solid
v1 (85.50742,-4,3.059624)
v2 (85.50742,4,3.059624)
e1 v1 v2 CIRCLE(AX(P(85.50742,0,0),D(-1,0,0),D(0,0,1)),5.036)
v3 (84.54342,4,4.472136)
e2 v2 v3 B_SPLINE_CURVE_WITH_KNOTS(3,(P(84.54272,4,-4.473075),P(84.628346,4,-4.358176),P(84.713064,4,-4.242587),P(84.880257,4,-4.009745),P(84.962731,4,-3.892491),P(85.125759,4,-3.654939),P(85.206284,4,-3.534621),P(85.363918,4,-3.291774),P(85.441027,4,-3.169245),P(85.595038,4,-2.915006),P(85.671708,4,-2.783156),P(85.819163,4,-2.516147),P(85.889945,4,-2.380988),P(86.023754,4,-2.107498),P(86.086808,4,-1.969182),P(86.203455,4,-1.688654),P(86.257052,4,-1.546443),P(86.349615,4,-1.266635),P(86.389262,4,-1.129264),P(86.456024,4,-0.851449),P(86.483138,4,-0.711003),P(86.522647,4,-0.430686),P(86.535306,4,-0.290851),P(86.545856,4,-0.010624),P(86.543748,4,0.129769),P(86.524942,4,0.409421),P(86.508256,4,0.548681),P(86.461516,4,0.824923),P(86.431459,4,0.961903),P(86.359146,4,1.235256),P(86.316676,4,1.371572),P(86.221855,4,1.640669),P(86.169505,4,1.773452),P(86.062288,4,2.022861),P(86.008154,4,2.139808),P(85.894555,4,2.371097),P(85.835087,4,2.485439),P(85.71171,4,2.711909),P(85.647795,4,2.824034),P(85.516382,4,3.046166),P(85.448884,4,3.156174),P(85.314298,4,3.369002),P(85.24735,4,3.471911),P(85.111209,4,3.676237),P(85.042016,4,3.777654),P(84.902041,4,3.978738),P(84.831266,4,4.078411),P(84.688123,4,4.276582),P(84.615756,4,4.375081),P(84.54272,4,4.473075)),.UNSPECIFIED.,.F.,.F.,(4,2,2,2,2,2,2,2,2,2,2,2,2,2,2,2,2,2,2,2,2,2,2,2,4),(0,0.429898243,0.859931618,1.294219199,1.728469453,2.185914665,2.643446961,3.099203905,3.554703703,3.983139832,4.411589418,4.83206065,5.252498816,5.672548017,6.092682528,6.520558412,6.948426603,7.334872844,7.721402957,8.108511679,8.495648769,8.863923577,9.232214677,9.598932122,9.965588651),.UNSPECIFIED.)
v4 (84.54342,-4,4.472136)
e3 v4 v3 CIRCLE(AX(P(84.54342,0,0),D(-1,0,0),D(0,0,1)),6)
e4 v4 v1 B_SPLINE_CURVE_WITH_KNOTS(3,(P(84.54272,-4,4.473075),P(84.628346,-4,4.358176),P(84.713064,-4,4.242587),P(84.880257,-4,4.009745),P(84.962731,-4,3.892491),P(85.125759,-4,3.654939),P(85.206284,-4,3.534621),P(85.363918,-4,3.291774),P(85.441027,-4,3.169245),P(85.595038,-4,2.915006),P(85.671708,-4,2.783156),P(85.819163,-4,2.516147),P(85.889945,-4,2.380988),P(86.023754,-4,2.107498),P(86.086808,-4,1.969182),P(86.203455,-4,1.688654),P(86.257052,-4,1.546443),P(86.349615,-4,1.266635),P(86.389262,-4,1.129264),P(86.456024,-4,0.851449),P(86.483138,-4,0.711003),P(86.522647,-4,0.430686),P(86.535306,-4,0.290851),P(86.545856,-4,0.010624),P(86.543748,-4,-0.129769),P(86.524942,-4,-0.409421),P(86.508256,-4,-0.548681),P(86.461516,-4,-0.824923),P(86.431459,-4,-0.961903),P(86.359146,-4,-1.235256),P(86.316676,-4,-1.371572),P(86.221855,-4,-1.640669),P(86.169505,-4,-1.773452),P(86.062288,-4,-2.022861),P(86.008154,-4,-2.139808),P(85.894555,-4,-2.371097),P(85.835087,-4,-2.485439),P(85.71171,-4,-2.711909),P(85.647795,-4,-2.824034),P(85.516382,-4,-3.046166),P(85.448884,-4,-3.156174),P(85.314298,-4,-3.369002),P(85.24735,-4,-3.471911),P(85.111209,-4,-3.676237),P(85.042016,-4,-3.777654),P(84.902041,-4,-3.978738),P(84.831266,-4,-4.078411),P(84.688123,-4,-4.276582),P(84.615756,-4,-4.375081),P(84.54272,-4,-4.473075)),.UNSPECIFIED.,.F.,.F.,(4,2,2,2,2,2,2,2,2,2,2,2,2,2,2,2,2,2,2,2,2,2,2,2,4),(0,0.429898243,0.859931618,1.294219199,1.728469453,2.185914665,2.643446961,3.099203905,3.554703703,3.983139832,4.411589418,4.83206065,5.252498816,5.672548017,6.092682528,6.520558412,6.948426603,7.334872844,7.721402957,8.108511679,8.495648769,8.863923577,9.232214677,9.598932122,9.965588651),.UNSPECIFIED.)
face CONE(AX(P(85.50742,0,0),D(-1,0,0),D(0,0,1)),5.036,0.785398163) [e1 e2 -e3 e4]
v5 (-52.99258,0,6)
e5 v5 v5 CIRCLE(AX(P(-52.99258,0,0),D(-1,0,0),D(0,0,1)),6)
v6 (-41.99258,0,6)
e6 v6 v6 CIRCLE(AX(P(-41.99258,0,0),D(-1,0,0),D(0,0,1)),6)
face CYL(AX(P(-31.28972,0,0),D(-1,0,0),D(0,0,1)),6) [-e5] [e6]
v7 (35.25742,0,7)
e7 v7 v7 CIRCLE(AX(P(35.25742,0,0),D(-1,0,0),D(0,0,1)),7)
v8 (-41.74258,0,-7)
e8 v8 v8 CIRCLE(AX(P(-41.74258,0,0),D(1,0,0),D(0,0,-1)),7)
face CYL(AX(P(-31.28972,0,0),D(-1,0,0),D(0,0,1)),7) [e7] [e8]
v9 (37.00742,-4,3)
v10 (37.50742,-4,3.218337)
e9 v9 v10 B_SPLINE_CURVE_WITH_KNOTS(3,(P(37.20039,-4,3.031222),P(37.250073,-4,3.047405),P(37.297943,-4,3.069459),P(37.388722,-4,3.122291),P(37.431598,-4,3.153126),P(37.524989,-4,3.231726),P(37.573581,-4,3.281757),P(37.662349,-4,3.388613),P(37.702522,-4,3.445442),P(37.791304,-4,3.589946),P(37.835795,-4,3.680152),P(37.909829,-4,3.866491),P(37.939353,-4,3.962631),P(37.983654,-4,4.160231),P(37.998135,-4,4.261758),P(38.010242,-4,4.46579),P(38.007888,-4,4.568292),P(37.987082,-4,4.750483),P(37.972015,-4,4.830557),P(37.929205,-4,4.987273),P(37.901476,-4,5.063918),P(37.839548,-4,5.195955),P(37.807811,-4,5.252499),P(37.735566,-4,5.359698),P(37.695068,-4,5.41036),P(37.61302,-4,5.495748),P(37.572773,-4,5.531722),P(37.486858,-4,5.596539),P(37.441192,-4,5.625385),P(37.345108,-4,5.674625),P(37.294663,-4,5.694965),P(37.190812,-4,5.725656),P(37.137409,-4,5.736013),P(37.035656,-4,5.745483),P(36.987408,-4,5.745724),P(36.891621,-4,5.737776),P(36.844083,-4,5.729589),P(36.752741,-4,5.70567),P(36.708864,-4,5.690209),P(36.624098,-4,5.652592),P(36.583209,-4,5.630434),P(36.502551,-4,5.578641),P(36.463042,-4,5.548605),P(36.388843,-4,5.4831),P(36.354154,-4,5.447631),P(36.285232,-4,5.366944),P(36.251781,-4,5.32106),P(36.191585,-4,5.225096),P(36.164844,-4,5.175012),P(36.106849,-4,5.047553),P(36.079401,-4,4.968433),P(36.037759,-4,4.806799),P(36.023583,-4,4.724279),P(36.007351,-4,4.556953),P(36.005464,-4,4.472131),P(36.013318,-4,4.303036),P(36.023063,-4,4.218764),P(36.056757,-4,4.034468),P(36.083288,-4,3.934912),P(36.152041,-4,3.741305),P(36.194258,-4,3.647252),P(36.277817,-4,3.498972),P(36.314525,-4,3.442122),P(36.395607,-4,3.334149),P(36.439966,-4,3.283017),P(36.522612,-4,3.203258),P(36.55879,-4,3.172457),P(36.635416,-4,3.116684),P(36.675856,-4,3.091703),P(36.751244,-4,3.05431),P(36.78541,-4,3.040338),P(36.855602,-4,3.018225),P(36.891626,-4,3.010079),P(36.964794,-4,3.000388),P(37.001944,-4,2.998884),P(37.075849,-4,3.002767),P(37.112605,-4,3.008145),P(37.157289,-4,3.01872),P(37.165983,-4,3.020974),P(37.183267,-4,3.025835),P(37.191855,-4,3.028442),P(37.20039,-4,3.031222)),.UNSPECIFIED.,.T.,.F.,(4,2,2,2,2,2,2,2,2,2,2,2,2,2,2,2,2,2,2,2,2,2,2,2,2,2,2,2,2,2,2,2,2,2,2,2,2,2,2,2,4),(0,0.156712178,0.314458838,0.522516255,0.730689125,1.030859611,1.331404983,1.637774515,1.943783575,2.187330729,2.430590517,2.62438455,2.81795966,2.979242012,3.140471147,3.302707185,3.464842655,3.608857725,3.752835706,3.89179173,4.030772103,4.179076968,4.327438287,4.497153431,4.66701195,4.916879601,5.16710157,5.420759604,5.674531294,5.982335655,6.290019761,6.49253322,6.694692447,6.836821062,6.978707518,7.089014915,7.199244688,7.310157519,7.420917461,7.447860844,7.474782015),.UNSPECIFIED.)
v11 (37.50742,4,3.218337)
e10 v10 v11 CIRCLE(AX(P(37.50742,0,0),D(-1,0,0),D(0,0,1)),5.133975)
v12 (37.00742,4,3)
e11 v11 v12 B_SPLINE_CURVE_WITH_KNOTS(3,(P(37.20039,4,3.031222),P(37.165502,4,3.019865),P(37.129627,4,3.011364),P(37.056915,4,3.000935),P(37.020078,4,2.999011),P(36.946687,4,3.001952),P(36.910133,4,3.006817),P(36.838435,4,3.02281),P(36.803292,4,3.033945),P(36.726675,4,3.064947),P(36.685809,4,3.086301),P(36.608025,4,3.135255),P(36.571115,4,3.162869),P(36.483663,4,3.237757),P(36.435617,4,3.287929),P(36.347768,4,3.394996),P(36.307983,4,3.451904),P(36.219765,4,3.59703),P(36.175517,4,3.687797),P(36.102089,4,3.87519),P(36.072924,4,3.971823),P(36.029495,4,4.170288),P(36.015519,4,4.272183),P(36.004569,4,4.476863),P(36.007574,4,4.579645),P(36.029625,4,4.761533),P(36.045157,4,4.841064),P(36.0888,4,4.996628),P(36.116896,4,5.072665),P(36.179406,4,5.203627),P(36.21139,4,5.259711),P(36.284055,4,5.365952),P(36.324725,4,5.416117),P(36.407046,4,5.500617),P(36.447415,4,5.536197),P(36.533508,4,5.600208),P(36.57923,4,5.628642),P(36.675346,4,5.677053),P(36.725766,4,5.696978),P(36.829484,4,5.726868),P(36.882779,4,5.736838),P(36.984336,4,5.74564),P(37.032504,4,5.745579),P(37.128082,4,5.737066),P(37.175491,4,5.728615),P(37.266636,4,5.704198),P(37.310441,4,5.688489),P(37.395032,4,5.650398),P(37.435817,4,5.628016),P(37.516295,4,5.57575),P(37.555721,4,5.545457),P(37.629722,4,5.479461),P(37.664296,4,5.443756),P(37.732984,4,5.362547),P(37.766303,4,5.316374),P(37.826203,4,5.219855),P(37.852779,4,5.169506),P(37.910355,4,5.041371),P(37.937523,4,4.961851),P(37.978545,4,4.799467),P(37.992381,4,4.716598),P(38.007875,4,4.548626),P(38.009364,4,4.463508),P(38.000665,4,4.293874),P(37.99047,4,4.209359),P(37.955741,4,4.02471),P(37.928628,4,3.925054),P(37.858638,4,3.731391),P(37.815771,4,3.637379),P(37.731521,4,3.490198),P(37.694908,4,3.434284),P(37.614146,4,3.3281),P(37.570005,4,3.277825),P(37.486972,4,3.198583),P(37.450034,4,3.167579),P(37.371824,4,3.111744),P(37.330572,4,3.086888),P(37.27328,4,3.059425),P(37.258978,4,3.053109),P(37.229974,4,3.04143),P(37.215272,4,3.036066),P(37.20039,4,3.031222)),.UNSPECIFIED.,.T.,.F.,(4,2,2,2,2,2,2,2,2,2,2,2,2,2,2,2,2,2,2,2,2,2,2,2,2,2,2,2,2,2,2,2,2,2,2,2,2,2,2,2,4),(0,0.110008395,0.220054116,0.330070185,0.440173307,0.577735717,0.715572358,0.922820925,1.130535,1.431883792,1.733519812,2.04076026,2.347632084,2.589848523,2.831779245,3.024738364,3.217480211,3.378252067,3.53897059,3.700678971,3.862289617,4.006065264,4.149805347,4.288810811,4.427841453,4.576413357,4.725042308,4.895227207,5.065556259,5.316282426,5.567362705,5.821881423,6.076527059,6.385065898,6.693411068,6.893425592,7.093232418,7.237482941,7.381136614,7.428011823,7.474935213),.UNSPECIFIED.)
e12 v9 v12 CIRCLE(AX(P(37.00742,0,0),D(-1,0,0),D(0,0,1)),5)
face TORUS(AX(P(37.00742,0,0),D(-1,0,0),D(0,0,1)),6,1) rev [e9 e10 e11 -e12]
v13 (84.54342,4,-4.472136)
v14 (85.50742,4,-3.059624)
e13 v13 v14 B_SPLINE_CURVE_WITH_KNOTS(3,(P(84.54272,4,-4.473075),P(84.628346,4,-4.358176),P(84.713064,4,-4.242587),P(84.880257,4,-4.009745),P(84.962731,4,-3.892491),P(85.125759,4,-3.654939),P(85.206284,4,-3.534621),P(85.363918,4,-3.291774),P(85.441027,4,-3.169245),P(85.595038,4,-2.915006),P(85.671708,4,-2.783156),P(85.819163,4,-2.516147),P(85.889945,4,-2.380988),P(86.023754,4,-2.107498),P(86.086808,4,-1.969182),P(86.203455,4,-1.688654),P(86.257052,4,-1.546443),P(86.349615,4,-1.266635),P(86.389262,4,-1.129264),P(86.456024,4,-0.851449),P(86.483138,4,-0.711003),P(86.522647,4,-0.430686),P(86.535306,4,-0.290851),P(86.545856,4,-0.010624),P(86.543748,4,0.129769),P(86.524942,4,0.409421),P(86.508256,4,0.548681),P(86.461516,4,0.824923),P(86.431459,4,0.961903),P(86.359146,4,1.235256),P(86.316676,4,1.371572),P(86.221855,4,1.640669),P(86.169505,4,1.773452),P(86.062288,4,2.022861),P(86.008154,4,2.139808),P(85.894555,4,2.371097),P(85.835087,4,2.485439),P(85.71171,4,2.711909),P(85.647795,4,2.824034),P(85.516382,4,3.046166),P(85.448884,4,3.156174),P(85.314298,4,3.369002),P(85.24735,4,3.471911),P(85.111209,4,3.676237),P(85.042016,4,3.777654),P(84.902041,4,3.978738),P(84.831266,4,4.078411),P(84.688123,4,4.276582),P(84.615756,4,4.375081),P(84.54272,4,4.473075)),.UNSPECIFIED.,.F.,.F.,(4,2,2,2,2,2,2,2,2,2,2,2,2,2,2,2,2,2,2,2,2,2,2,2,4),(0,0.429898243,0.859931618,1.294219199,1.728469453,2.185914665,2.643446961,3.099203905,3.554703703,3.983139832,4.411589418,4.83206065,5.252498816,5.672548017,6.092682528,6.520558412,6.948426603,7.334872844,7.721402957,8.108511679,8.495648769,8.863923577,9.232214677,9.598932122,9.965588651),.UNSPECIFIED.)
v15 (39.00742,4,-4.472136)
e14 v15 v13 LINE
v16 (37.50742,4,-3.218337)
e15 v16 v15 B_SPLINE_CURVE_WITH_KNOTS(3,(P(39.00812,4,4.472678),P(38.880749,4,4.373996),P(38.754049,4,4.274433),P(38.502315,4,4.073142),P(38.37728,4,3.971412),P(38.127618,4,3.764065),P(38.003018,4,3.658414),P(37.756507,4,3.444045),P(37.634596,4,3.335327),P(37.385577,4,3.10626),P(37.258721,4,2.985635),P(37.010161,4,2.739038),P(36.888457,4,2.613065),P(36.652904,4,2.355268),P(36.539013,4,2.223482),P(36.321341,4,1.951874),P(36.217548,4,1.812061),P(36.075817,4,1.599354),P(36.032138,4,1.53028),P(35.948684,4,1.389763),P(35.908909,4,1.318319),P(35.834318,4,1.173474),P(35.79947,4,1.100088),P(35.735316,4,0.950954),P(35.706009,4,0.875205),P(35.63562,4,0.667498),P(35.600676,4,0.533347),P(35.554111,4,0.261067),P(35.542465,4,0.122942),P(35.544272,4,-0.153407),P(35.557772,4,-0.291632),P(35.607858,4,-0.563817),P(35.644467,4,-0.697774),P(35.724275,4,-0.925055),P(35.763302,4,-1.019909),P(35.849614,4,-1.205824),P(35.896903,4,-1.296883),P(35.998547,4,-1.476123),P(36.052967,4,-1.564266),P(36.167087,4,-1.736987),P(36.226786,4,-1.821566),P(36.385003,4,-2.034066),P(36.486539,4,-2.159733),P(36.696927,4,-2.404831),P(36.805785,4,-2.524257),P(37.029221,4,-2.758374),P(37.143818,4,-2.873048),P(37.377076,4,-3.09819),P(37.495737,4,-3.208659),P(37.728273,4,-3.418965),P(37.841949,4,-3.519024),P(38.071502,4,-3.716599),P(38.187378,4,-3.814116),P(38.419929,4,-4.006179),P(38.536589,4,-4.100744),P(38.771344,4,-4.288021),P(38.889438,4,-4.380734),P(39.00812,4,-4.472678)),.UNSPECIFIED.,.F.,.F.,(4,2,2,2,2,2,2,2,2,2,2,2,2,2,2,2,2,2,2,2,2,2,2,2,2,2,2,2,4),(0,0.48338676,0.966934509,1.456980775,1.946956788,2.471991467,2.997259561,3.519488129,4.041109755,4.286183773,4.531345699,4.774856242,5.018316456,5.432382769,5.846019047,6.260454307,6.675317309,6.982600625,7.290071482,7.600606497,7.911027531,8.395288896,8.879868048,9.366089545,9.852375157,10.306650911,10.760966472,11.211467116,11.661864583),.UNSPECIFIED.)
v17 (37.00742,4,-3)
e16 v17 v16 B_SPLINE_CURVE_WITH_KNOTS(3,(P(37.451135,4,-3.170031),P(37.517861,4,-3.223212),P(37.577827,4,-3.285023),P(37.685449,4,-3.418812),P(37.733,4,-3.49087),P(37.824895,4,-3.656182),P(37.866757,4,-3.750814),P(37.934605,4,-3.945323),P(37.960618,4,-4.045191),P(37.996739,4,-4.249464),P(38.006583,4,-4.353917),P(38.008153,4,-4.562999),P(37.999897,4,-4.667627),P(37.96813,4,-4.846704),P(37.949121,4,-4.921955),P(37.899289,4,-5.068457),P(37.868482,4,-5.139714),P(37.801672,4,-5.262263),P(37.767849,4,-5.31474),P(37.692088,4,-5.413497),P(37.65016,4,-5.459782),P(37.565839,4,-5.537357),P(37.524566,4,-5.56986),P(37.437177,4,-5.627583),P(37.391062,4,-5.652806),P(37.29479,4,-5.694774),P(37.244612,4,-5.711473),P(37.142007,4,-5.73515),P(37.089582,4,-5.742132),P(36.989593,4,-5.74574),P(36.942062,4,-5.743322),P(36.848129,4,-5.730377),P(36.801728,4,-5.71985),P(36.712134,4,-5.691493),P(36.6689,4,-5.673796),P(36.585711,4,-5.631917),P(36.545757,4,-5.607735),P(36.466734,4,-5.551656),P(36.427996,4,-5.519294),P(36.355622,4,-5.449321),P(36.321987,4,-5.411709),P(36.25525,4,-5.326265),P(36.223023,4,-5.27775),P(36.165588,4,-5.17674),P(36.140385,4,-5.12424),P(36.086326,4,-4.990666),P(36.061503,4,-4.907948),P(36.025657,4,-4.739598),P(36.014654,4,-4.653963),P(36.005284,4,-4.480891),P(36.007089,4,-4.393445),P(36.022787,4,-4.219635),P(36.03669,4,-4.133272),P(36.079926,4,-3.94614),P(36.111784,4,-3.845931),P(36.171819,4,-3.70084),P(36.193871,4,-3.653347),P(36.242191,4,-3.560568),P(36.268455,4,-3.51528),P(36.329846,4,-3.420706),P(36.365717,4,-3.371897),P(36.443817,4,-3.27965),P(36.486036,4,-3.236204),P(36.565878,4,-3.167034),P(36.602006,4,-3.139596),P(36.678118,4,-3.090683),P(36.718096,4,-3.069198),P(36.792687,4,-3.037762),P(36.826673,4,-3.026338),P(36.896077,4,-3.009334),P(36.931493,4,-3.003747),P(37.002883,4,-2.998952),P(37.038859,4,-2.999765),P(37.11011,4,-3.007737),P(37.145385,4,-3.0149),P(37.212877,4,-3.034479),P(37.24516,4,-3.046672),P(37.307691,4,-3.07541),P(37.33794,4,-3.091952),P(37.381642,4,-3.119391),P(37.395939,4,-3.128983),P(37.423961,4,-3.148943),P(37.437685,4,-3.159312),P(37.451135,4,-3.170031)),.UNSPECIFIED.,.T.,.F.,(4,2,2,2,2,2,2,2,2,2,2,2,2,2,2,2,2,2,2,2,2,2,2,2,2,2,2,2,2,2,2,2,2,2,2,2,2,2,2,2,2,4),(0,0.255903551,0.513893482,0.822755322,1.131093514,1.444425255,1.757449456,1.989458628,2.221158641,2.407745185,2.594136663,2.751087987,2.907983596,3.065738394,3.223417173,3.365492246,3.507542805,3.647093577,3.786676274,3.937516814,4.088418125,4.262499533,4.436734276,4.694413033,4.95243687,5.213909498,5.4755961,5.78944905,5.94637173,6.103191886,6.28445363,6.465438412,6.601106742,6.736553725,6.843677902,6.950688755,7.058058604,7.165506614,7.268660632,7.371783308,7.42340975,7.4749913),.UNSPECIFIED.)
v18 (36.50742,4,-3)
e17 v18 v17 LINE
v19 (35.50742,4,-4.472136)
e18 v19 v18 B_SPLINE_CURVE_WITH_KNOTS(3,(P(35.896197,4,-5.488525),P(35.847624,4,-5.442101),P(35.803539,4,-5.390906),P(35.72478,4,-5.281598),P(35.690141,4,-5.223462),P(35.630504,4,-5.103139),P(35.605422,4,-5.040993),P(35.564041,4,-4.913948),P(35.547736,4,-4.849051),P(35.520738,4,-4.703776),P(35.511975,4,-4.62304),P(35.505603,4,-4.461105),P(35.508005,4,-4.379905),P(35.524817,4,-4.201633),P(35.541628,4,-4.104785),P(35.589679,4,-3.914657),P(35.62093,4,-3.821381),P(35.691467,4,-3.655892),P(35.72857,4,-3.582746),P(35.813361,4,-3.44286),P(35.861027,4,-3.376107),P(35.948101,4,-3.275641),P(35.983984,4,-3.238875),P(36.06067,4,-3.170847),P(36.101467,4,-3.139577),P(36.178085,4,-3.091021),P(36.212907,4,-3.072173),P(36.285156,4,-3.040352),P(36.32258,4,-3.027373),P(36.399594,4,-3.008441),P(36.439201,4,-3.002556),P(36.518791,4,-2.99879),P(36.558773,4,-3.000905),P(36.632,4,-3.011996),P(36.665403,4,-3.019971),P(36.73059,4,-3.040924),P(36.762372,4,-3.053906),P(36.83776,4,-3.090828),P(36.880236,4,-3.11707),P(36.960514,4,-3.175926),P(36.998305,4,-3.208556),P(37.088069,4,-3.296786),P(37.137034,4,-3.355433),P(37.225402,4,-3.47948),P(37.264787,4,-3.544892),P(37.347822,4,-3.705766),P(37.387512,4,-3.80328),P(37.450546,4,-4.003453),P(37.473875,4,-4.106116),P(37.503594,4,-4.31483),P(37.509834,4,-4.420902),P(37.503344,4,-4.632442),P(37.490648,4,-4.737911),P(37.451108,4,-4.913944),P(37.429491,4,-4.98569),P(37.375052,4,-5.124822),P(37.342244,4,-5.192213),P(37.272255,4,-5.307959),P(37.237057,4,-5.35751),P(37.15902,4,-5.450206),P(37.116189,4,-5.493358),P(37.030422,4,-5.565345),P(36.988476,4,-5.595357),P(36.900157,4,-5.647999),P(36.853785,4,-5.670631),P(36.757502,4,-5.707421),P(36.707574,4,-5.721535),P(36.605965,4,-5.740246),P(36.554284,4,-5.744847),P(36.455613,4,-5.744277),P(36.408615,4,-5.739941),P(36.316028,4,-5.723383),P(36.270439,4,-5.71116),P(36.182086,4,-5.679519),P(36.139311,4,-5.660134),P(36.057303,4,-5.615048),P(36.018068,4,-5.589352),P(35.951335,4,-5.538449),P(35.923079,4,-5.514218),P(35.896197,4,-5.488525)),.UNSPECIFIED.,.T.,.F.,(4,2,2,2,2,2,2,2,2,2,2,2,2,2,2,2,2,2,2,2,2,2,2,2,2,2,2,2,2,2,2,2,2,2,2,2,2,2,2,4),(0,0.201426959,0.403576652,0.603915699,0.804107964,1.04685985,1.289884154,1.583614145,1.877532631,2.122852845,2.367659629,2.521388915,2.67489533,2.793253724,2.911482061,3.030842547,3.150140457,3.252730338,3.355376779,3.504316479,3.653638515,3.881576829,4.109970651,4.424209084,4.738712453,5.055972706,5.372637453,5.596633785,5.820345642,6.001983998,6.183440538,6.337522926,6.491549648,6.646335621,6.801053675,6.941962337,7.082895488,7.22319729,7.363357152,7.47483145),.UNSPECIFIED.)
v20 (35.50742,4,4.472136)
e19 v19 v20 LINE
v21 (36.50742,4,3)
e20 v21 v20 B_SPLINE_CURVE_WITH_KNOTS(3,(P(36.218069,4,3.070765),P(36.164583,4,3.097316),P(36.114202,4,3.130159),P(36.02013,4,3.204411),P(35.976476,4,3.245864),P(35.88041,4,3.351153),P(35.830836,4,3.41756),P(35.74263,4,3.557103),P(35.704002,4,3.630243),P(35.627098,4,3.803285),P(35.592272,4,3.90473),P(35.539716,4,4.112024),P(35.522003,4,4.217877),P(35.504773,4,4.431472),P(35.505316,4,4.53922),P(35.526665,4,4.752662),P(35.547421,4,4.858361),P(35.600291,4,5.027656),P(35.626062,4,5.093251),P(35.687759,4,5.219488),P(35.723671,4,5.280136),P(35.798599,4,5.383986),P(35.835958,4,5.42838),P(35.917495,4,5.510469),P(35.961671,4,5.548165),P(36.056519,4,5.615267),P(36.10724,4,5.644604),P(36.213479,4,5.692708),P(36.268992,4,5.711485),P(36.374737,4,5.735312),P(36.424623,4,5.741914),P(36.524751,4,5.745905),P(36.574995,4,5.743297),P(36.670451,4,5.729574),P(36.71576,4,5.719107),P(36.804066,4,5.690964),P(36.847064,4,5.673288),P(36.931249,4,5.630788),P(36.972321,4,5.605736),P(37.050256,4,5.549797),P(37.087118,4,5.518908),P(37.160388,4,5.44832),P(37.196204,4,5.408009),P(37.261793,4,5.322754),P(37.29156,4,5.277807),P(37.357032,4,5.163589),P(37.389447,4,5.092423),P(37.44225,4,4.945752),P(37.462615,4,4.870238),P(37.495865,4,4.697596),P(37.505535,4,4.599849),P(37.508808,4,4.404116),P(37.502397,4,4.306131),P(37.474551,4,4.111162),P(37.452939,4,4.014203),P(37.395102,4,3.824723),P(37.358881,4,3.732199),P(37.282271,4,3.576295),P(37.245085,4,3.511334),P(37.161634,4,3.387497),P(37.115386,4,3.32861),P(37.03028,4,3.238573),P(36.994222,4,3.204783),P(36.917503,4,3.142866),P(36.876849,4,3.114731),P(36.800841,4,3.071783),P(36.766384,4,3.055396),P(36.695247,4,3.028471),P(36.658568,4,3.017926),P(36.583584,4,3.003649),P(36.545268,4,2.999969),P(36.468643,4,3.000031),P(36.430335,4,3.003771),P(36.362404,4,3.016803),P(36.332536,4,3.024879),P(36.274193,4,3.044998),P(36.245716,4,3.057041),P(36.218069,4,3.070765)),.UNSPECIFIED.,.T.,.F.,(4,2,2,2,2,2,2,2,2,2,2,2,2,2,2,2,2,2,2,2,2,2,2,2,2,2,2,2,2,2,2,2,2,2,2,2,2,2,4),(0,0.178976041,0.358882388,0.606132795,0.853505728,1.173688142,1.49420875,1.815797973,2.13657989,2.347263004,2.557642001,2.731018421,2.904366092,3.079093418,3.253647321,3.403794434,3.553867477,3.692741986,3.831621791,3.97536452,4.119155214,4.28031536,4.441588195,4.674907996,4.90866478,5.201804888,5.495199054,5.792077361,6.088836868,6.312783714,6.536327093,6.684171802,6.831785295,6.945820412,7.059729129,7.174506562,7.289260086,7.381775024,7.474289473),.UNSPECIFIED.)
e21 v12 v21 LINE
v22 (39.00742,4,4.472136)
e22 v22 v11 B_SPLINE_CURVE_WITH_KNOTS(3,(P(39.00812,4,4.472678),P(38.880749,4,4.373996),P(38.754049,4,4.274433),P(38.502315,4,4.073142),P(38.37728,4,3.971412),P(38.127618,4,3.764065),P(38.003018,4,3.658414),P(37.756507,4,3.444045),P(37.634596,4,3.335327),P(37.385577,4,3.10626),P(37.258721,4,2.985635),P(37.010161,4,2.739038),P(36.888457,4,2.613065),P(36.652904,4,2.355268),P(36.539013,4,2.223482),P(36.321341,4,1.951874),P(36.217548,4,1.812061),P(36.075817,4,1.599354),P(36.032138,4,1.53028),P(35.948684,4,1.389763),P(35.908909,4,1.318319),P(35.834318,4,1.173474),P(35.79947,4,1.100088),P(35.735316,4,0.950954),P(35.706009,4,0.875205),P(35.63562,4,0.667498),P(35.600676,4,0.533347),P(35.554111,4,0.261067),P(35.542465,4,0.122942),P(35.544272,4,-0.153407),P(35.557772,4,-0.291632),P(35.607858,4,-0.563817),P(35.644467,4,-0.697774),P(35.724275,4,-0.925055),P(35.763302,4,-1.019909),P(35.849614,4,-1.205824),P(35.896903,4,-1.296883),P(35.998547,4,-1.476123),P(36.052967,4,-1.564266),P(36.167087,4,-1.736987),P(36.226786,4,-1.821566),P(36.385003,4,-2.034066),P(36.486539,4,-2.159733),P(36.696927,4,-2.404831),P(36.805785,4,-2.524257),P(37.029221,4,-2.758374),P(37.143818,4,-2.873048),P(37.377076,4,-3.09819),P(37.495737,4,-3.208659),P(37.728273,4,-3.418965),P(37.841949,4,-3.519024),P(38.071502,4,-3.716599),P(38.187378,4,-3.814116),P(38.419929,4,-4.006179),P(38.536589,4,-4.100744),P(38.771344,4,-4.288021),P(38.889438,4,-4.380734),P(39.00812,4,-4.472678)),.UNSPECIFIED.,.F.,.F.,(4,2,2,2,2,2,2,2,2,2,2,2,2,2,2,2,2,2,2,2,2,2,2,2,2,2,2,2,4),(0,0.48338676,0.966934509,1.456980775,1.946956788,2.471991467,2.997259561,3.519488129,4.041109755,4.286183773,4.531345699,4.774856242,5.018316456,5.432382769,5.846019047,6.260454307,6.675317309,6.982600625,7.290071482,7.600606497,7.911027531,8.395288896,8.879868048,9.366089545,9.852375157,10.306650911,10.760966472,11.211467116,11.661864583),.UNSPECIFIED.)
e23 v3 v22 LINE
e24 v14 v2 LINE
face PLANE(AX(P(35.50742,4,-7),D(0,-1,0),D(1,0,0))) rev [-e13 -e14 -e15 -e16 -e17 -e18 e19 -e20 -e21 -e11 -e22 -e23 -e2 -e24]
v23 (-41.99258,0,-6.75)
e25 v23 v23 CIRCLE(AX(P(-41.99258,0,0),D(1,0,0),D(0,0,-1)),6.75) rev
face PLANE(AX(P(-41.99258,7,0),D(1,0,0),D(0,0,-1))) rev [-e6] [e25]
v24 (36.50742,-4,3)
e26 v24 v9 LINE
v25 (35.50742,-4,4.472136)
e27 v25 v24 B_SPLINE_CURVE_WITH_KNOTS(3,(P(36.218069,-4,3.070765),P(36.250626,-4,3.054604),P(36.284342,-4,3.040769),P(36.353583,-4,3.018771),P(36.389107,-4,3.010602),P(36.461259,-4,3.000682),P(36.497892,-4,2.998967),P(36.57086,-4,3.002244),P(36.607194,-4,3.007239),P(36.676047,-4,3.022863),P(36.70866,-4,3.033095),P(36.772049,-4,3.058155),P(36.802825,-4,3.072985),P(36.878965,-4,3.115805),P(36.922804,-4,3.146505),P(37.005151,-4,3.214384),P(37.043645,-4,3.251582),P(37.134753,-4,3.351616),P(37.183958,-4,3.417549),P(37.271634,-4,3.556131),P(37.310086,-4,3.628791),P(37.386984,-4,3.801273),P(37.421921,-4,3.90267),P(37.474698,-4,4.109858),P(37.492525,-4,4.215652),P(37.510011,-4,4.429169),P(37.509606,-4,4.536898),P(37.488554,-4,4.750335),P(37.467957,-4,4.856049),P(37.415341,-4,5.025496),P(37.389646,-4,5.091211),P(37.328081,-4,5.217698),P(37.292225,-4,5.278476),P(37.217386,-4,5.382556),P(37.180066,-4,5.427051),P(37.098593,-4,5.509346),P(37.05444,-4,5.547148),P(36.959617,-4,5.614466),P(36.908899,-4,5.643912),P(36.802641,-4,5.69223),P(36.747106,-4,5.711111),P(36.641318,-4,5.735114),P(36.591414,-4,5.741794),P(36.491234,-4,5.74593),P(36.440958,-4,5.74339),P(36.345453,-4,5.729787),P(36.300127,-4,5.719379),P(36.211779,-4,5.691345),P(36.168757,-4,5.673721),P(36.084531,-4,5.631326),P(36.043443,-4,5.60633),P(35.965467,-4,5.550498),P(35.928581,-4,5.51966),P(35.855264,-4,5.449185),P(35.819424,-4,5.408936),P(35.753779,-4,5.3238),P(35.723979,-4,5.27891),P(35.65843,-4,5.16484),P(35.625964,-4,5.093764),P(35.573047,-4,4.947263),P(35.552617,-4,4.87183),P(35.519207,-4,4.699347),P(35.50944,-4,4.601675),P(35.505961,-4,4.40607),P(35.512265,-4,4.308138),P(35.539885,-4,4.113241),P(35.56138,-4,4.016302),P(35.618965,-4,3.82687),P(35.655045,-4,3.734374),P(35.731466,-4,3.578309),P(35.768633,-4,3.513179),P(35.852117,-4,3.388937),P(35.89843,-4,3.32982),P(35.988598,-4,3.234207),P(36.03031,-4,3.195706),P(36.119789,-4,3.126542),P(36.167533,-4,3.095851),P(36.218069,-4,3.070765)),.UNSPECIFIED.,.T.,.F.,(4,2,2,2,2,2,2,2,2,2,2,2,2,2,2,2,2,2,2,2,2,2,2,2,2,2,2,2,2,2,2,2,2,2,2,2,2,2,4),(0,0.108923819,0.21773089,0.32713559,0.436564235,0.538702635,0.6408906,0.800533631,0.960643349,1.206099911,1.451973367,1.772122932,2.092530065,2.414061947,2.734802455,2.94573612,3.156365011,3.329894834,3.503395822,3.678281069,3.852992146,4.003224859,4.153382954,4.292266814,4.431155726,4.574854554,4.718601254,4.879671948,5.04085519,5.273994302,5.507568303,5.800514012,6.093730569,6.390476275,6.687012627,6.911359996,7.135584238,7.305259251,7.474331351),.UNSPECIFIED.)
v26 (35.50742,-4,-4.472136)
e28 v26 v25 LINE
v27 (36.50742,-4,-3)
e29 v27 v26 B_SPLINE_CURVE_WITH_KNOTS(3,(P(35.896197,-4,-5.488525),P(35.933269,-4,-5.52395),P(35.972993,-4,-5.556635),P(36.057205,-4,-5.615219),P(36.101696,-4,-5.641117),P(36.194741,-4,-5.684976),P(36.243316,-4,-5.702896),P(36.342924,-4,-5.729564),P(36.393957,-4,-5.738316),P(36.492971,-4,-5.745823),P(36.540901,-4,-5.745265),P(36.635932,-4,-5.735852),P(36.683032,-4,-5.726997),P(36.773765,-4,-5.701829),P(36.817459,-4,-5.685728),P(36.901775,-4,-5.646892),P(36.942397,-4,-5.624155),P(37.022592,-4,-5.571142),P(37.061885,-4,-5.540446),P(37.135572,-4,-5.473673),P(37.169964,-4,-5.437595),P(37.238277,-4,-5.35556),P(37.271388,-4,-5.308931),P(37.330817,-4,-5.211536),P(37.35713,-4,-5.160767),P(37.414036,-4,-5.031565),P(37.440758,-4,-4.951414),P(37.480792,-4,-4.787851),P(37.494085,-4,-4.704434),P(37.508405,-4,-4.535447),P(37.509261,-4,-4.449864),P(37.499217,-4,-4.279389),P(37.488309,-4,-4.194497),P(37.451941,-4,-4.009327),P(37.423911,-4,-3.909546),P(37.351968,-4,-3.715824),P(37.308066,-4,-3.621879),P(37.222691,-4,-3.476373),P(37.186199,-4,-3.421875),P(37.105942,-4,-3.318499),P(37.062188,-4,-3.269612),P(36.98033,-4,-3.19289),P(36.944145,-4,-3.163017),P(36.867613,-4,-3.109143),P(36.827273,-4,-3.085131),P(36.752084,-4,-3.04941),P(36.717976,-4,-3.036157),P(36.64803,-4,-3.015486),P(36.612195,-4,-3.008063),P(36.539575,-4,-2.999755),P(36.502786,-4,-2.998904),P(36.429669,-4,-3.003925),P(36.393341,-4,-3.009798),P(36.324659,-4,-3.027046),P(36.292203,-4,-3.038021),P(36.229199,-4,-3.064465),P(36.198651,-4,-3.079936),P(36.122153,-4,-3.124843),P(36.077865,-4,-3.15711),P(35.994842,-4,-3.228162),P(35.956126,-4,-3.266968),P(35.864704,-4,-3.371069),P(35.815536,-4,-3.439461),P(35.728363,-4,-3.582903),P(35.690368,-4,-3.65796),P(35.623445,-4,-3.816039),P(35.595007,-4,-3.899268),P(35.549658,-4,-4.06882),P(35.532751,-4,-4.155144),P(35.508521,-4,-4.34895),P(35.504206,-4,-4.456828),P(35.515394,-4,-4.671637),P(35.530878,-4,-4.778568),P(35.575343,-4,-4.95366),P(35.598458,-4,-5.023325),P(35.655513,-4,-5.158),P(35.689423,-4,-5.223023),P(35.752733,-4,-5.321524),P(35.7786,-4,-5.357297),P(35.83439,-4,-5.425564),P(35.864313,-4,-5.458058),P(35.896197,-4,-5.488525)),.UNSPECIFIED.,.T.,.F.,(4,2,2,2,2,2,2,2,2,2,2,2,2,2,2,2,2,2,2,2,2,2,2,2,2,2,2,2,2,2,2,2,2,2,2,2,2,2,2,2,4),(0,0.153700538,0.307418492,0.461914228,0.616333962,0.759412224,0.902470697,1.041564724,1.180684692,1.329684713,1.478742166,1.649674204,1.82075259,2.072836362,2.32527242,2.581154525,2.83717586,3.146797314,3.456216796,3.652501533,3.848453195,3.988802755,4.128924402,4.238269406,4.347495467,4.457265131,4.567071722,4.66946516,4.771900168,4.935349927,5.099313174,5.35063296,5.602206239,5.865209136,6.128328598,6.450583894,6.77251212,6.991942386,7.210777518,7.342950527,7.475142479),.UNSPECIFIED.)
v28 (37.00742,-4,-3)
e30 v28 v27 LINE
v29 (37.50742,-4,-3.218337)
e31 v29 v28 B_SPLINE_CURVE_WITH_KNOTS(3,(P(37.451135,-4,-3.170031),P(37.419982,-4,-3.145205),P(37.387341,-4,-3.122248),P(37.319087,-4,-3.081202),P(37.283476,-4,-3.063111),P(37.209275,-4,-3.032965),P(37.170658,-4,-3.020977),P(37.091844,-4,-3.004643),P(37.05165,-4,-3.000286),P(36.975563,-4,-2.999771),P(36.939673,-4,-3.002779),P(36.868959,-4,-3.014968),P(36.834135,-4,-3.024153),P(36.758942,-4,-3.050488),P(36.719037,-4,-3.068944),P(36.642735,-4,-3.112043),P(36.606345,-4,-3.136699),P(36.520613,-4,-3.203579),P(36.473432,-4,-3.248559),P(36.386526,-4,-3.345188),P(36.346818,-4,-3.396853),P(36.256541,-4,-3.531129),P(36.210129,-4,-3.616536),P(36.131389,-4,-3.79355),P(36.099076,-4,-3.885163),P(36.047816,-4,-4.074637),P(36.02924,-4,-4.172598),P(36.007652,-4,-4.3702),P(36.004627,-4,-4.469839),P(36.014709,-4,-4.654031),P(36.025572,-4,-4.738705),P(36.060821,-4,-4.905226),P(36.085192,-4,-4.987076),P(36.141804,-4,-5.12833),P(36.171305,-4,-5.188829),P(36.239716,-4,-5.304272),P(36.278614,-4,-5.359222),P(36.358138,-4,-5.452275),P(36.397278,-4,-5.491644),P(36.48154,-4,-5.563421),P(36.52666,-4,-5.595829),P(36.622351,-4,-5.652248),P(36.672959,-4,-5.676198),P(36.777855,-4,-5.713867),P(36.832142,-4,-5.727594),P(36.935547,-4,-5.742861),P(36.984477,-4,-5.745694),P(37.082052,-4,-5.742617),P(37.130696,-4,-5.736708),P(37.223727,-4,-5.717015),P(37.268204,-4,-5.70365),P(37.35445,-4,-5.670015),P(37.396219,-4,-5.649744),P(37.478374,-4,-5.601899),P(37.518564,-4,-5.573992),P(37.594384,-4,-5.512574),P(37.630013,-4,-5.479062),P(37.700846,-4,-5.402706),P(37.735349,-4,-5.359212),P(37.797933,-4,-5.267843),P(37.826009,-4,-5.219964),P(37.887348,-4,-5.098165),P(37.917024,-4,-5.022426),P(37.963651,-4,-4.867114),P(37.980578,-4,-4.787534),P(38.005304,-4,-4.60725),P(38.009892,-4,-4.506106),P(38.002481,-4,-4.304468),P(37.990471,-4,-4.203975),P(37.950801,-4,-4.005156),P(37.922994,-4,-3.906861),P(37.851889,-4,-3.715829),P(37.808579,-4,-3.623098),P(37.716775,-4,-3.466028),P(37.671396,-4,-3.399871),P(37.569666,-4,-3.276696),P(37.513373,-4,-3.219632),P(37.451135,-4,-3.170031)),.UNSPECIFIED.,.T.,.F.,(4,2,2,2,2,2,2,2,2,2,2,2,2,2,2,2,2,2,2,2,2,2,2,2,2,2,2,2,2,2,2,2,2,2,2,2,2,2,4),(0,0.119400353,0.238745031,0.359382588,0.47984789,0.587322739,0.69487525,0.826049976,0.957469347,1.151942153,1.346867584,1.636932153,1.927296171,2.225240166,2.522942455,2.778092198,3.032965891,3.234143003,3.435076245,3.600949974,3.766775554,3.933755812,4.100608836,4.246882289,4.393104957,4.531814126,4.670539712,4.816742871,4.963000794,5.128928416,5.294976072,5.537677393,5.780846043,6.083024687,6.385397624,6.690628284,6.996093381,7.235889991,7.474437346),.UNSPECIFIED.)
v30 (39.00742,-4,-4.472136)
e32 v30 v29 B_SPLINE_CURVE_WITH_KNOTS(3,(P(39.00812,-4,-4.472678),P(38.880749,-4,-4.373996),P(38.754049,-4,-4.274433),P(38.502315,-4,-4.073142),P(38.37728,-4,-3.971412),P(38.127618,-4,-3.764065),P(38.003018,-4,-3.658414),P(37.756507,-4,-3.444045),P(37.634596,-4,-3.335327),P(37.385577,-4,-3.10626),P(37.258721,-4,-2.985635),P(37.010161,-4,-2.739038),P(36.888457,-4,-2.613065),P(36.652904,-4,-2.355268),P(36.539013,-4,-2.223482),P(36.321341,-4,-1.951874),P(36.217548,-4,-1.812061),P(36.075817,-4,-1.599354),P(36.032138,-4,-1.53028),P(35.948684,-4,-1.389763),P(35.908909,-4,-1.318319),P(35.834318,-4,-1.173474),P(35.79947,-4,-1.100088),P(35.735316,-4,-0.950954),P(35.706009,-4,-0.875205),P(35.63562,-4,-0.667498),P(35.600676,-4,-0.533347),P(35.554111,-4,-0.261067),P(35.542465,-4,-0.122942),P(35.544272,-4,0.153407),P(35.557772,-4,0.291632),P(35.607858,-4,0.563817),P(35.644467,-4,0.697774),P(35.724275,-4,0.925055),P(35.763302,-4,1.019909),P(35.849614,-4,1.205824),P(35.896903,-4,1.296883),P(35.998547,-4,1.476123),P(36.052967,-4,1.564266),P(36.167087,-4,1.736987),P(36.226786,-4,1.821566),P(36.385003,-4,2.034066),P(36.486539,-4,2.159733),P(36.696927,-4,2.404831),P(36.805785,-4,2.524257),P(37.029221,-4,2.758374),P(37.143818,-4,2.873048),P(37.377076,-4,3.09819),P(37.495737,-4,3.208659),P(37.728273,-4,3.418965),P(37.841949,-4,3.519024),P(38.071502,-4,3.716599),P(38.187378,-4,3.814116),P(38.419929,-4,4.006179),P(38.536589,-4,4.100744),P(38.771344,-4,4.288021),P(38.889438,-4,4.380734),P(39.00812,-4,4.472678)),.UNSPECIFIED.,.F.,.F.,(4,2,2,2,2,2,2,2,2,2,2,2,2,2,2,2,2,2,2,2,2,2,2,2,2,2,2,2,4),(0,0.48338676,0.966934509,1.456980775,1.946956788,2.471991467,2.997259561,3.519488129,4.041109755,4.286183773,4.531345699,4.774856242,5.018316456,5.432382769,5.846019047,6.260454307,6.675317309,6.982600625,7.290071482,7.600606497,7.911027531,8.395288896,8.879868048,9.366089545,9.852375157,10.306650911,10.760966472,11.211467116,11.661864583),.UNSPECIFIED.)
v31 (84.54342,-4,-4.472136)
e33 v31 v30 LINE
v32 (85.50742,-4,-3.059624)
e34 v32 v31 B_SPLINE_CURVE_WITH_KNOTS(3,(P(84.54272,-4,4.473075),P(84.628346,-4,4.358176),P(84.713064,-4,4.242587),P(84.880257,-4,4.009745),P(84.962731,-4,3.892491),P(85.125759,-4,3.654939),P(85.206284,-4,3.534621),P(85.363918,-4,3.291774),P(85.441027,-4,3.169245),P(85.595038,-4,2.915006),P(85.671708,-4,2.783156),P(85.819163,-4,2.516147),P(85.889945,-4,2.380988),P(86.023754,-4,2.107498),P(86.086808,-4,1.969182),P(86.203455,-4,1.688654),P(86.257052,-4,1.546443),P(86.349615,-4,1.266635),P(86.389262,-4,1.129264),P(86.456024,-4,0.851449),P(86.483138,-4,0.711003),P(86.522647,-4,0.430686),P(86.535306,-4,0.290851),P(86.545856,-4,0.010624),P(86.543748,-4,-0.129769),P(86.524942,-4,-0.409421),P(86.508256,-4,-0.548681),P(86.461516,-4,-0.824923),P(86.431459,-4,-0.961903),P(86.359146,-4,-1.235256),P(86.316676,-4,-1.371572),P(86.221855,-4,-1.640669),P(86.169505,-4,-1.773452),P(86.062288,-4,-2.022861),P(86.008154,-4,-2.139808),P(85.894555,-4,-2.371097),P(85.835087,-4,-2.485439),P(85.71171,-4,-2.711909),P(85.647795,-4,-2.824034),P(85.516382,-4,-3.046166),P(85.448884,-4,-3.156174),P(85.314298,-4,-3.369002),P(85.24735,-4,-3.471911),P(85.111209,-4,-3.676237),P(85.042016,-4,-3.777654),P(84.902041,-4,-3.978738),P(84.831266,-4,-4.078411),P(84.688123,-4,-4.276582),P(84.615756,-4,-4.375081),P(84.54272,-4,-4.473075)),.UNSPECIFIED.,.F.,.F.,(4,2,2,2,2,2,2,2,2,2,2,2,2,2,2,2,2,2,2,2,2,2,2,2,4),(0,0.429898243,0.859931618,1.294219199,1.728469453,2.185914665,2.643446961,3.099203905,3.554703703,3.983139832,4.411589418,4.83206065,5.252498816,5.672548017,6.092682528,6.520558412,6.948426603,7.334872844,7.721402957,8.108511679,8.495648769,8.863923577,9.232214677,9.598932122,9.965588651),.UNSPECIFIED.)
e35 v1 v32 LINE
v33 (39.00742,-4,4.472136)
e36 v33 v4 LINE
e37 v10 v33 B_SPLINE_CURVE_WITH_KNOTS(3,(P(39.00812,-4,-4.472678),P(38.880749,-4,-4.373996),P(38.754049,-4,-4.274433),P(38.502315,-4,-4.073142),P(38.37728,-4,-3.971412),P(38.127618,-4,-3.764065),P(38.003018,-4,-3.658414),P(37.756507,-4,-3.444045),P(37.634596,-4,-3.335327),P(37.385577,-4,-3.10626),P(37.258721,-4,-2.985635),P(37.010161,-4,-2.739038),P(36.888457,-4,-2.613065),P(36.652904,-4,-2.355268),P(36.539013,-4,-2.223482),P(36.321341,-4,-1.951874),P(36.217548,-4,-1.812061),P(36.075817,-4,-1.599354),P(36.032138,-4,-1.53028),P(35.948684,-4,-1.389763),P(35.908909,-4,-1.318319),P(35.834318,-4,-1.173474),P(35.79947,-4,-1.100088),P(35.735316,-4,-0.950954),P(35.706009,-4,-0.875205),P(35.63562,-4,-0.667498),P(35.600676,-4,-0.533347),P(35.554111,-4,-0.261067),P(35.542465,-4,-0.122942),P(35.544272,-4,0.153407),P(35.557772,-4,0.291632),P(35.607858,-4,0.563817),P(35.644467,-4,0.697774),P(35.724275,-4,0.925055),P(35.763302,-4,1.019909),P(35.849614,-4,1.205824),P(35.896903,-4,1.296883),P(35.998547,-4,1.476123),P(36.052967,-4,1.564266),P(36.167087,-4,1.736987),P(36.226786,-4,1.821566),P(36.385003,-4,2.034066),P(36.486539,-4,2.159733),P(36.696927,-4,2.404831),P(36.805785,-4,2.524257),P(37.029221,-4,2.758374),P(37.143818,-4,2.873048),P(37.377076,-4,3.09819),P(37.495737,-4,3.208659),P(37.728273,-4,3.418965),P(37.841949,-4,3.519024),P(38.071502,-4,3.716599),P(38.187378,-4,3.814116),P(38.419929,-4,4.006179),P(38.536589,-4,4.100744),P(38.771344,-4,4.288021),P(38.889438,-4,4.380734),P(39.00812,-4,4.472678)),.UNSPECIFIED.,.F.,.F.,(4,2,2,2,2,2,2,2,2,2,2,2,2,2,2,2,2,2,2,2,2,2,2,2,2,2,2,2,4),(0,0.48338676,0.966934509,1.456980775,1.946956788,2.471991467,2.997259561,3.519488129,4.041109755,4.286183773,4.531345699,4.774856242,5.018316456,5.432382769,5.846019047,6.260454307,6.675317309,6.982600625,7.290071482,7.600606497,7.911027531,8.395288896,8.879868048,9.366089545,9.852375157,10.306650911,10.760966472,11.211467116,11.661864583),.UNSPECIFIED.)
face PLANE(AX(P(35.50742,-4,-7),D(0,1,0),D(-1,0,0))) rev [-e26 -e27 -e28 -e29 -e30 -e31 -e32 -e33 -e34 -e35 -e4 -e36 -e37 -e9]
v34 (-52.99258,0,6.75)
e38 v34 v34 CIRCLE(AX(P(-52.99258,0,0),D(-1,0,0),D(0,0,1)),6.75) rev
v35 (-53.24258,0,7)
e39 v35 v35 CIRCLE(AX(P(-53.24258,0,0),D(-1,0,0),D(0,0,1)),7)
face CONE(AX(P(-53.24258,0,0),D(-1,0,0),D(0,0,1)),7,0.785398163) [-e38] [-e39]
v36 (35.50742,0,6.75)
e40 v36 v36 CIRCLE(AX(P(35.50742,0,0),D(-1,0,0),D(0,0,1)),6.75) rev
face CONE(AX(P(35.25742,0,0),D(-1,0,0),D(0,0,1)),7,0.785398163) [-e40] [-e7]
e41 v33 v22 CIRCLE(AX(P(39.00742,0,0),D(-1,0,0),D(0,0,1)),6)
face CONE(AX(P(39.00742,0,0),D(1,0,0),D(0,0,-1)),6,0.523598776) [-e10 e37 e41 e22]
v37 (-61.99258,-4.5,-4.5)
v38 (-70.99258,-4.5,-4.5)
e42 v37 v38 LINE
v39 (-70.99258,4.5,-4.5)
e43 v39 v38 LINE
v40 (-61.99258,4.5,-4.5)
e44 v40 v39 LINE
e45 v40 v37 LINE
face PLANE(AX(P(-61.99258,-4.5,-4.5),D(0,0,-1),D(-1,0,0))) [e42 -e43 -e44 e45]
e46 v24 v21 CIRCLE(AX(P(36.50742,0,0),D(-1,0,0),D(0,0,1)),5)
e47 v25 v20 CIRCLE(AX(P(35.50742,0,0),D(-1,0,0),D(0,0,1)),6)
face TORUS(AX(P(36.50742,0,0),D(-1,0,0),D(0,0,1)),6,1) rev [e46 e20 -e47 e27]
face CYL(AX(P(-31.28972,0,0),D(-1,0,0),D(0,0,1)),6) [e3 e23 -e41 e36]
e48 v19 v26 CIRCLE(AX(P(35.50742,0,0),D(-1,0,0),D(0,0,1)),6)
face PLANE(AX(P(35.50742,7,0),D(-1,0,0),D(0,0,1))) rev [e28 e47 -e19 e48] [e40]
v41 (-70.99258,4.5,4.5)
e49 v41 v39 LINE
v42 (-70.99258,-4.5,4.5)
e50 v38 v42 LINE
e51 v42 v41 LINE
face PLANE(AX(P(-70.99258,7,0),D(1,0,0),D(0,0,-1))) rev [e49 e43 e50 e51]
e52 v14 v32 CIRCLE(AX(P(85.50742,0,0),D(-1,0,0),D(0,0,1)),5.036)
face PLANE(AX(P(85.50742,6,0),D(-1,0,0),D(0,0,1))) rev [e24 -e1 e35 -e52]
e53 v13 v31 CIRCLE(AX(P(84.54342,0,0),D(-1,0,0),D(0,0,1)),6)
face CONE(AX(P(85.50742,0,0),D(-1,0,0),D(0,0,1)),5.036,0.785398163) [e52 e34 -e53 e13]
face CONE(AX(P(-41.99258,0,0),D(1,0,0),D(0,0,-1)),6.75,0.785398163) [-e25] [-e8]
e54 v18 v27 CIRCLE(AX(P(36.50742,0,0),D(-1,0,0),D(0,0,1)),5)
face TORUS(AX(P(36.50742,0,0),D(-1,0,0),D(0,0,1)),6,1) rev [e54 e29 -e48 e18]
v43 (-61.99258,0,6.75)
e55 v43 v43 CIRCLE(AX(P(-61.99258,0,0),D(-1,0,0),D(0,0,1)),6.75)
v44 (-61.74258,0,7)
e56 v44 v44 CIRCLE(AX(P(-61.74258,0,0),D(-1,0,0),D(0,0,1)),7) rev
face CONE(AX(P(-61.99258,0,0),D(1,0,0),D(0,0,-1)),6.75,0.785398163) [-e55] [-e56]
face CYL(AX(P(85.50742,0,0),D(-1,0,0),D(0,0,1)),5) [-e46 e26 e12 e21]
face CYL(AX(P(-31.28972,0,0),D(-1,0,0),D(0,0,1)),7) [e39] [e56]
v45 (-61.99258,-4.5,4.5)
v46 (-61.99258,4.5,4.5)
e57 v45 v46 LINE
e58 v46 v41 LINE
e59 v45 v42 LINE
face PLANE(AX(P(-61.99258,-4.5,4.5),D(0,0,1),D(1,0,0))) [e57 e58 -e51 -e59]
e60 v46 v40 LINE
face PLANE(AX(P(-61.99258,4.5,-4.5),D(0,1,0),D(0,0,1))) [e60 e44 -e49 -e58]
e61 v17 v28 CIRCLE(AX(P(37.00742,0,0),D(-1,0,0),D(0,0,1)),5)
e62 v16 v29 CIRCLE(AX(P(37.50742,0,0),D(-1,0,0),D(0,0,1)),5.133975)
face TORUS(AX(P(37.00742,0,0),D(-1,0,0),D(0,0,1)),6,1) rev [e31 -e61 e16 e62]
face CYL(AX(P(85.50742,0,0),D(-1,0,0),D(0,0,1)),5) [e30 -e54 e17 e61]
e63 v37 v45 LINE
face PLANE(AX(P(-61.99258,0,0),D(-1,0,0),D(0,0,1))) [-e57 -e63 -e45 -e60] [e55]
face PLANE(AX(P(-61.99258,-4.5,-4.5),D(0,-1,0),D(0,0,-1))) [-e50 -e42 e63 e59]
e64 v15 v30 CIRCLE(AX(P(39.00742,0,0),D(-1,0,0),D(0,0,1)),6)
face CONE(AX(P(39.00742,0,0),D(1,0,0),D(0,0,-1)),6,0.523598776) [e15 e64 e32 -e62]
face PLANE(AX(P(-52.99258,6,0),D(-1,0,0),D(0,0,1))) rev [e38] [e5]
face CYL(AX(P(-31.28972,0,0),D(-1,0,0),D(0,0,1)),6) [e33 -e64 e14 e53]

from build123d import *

# Parameters (mm, degrees)
SCHNITT_LINEAR_AUSTRAGEN1_DEPTH      = 87.078562226
SCHNITT_LINEAR_AUSTRAGEN1_DEPTH_BACK = 87.078562226
SKIZZE4_W                            = 136.51116069
SKIZZE4_H                            = 4.996766738
SCHNITT_LINEAR_START                 = -9
SKIZZE5_R                            = 7
SKIZZE5_W                            = 9
SKIZZE5_H                            = 9
SCHNITT_LINEAR_AUSTRAGEN2_DEPTH      = 9
FASE1_SIZE                           = 0.25


# Read off the part's stored shape, not the designer's step: M12 Maschinengewinde Bolzen1
with BuildPart() as part:
    # Skizze2 → Rotation1 (revolve)
    with BuildSketch(Plane.XY, mode=Mode.PRIVATE) as rotation1_sk:
        Polygon((35.507419999, 7), (35.507419999, 6), (85.507419999, 6), (85.507419999, 0), (-70.992580001, 0), (-70.992580001, 7), (-52.992580001, 7), (-52.992580001, 6), (-41.992580001, 6), (-41.992580001, 7), align=None)
    revolve(rotation1_sk.sketch.rotate(Axis((-31.289719626, 0, 0), (1, 0, 0)), 90), axis=Axis((-31.289719626, 0, 0), (1, 0, 0)))

    # M12 Maschinengewinde Bolzen1 outline → M12 Maschinengewinde Bolzen1 (revolve, cut)
    with BuildSketch(Plane.YX):
        with BuildLine():
            Line((6, 39.007419999), (5.133974596, 37.507419999))
            ThreePointArc((5.133974596, 37.507419999), (5.034074174, 37.266239044), (5, 37.007419999))
            Line((5, 37.007419999), (5, 36.507419999))
            ThreePointArc((5, 36.507419999), (5.292893219, 35.800313218), (6, 35.507419999))
            Line((6, 35.507419999), (6, 39.007419999))
        make_face()
        Polygon((5.036, 85.507419999), (6, 84.543419999), (6, 85.507419999), align=None)
    revolve(axis=Axis((0, 0, 0), (1, 0, 0)), mode=Mode.SUBTRACT)

    # Skizze4 → Schnitt-Linear austragen1 (cut, two sides: drawn at the far end of the back side and taken through both)
    with BuildSketch(Plane.XY.offset(-SCHNITT_LINEAR_AUSTRAGEN1_DEPTH_BACK)):
        with Locations((103.763000344, 6.498383369)):
            Rectangle(SKIZZE4_W, SKIZZE4_H)
        with Locations((103.763000344, -6.498383369)):
            Rectangle(SKIZZE4_W, SKIZZE4_H)
    extrude(amount=SCHNITT_LINEAR_AUSTRAGEN1_DEPTH + SCHNITT_LINEAR_AUSTRAGEN1_DEPTH_BACK, mode=Mode.SUBTRACT)

    # Skizze5 → Schnitt-Linear austragen2 (cut)
    with BuildSketch(Plane.ZY.offset(70.992580001).offset(SCHNITT_LINEAR_START)):
        Circle(SKIZZE5_R)
        Rectangle(SKIZZE5_W, SKIZZE5_H, mode=Mode.SUBTRACT)
    extrude(amount=SCHNITT_LINEAR_AUSTRAGEN2_DEPTH, mode=Mode.SUBTRACT)

    # Fase1
    fase1_edges = [part.edges().sort_by_distance(p)[0] for p in [
        (-61.992580001, 0, -7),
        (-41.992580001, 0, -7),
        (-52.992580001, 0, -7),
        (35.507419999, 0, -7),
    ]]
    chamfer(fase1_edges, length=FASE1_SIZE)


solid = part.part
